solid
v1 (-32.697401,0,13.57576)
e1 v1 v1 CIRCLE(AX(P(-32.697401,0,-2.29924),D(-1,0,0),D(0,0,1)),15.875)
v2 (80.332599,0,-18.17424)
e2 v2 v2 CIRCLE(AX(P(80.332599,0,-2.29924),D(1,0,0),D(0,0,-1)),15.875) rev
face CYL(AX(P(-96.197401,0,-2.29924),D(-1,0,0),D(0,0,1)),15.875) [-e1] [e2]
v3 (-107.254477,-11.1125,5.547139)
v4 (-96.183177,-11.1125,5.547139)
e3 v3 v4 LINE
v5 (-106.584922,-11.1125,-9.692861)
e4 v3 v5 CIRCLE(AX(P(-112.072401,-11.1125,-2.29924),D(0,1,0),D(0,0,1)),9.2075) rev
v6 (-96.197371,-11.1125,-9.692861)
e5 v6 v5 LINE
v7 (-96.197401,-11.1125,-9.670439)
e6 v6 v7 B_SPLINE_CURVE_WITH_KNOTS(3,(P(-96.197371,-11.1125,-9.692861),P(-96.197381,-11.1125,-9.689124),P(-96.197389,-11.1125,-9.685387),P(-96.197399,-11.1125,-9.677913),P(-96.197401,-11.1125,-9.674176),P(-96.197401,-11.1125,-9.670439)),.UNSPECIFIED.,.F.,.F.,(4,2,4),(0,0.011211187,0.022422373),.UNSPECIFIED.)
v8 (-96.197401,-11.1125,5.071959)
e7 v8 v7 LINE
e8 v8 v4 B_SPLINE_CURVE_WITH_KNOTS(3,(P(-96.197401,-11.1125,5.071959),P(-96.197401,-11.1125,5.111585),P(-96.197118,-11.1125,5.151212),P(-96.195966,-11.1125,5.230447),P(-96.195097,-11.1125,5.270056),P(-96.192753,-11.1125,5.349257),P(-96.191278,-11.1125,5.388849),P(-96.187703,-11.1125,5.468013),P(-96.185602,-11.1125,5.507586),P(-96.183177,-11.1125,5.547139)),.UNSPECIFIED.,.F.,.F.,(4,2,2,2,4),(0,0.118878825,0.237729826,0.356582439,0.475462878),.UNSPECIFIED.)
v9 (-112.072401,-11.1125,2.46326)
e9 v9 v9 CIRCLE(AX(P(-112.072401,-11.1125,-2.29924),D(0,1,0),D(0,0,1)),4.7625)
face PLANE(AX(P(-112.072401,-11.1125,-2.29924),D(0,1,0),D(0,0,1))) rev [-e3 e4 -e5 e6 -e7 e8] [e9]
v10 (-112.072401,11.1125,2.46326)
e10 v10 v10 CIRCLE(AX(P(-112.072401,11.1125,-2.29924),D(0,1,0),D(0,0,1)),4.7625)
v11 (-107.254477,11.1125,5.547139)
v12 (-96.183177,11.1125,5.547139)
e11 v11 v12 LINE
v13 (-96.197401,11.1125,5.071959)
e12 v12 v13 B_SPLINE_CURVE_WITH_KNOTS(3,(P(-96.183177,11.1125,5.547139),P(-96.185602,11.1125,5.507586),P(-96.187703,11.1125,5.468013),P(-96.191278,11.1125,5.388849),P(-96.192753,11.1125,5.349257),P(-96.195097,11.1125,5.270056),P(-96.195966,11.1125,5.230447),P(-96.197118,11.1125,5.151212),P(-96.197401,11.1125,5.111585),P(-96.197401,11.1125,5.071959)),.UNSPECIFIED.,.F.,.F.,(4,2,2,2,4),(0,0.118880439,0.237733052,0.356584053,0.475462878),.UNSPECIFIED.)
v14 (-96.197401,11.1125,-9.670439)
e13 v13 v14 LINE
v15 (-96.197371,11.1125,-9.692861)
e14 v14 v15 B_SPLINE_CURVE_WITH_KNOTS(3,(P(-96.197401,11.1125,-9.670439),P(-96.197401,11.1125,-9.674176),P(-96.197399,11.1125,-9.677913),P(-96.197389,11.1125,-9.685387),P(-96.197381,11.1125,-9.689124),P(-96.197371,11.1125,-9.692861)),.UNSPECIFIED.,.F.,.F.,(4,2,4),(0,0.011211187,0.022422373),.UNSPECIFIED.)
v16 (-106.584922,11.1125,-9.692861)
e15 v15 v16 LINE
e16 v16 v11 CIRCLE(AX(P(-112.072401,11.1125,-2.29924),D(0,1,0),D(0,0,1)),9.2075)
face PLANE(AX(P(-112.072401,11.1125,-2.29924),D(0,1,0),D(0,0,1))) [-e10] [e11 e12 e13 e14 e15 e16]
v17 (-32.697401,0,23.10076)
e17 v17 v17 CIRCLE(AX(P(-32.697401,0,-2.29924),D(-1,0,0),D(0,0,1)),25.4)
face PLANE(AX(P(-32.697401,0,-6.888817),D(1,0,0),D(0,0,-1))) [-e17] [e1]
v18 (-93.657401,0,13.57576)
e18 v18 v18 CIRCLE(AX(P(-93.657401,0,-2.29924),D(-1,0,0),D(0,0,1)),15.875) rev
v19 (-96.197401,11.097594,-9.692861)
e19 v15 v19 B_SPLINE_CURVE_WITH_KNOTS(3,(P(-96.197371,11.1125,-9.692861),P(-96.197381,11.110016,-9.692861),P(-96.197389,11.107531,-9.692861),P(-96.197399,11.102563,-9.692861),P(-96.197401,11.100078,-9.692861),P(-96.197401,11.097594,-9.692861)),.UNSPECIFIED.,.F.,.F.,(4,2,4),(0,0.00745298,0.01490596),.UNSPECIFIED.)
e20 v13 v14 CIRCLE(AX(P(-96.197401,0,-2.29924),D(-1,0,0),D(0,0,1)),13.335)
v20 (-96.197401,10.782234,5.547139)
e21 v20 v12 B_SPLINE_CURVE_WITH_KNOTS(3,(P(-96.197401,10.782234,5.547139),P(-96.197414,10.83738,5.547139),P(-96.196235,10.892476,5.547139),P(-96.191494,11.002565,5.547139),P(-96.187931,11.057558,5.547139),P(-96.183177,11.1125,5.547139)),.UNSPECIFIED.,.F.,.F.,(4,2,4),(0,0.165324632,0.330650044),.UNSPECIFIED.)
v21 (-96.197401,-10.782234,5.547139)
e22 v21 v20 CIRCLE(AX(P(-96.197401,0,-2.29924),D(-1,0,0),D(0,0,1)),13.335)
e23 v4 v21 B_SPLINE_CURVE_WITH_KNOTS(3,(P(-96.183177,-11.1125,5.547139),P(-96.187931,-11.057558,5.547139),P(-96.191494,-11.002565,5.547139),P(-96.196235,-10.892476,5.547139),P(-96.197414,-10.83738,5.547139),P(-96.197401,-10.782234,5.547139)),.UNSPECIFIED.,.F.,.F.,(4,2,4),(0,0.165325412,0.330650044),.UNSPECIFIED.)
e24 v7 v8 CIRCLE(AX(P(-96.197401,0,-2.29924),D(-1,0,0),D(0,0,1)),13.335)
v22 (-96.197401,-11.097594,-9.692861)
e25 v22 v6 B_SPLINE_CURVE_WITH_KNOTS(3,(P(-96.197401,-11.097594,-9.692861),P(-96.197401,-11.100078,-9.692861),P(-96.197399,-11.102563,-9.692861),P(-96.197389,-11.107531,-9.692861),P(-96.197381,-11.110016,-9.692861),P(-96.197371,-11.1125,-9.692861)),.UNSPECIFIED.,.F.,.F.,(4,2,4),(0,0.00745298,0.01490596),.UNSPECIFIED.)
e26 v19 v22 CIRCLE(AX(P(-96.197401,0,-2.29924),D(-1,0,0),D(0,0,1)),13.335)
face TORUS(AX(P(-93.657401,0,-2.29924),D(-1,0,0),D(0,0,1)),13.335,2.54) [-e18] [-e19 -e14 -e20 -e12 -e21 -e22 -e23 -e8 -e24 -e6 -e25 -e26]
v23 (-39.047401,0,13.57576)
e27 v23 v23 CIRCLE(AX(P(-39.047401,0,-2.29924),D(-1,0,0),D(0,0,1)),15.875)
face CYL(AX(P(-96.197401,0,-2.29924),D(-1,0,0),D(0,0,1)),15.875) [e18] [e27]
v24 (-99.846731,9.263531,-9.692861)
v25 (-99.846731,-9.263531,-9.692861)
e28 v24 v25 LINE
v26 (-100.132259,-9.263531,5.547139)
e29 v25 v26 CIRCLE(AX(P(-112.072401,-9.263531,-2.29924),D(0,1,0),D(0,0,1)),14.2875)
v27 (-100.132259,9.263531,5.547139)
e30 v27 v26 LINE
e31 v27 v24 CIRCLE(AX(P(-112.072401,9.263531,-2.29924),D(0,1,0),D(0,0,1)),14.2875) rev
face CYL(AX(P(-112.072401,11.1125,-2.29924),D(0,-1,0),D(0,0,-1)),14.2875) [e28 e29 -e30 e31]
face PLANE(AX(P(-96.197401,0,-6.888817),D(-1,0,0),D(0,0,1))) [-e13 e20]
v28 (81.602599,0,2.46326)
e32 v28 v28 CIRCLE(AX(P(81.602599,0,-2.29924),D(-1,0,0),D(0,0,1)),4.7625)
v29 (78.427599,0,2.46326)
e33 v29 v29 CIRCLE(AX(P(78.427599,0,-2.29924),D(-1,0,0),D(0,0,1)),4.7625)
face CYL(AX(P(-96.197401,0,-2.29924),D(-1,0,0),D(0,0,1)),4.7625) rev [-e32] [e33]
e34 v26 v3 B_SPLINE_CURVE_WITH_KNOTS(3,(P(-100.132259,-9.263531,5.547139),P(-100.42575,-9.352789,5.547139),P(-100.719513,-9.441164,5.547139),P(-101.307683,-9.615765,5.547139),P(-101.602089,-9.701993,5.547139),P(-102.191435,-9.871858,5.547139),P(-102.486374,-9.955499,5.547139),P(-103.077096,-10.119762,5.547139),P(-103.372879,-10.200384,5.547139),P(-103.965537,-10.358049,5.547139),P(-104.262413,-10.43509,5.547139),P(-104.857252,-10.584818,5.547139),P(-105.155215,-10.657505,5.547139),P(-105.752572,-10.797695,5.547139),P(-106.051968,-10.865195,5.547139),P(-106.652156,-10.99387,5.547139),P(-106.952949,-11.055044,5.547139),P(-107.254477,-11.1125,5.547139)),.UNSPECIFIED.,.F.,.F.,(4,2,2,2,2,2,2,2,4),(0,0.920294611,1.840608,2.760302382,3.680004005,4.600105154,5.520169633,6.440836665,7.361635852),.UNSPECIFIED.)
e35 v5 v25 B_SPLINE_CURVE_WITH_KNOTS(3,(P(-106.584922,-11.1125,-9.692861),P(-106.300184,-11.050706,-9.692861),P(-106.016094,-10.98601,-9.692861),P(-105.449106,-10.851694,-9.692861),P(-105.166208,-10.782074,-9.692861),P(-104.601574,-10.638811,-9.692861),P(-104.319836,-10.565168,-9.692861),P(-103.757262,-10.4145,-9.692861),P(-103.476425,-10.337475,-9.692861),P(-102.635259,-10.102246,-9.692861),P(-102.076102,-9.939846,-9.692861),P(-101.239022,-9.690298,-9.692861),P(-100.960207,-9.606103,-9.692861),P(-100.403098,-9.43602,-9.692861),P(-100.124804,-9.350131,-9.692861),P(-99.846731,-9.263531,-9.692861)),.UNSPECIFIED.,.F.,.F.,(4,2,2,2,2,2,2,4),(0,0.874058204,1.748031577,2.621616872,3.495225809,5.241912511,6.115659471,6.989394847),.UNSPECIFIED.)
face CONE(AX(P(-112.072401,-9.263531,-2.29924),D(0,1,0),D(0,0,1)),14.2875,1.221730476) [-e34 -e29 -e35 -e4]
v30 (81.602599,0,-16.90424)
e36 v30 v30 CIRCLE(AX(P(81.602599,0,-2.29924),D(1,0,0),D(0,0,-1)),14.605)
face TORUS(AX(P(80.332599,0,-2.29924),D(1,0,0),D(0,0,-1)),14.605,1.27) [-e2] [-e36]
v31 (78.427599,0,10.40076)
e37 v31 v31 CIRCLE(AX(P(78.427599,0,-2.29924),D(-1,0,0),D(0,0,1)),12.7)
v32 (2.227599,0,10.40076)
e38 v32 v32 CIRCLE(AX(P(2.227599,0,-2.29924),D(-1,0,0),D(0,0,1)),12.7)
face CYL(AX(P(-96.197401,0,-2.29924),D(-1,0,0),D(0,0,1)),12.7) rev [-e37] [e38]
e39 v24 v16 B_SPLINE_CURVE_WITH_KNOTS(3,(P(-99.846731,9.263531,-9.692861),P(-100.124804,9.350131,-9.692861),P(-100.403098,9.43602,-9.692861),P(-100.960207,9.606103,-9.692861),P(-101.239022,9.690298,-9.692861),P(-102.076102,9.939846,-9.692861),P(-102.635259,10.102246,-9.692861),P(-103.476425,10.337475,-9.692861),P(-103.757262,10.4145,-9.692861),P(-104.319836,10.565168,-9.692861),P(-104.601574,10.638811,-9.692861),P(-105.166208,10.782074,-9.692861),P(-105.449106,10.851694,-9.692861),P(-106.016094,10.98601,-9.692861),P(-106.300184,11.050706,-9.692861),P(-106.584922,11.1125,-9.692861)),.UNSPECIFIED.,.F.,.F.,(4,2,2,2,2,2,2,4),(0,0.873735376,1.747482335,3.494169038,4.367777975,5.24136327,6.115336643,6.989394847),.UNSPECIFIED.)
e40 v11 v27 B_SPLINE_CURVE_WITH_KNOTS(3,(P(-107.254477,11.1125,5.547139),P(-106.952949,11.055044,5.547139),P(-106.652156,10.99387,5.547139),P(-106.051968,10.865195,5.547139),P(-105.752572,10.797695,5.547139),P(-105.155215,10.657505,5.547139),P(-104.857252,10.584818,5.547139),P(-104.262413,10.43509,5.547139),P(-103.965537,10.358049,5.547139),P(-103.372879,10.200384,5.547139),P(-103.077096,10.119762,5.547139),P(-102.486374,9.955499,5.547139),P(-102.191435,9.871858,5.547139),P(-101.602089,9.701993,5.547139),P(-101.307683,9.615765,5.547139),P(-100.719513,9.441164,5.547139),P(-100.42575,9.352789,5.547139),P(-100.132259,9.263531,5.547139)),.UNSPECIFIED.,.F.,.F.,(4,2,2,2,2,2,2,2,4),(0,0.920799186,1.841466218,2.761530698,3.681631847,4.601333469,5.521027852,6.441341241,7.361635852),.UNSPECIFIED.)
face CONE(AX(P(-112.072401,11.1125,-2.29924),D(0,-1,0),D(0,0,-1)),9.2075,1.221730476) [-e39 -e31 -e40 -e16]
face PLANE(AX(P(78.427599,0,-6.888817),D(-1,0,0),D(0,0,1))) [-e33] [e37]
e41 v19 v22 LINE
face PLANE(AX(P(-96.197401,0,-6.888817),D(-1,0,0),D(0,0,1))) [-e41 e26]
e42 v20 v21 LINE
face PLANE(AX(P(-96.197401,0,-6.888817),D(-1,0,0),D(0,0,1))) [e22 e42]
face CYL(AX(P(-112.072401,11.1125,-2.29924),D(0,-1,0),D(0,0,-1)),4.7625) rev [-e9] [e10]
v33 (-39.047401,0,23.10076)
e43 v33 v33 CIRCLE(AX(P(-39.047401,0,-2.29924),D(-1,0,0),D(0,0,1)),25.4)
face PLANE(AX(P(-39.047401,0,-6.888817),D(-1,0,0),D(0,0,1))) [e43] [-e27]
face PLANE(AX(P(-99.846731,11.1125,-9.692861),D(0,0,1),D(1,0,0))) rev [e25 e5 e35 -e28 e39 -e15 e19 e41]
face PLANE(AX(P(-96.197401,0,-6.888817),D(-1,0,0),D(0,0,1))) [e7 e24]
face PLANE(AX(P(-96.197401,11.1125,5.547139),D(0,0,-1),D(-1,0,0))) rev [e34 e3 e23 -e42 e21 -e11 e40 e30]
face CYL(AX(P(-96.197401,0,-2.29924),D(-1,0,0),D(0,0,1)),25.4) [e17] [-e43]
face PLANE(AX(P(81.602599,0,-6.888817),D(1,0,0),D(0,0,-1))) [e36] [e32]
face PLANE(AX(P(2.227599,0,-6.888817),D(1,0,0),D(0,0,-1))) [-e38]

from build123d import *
from OCP.BRepFilletAPI import BRepFilletAPI_MakeChamfer

# Parameters (mm, degrees)
SKETCH2_R           = 4.7625
BOSS_EXTRUDE1_DEPTH = 11.1125
FILLET1_R           = 2.54
CHAMFER1_SIZE       = 5.08
CHAMFER1_SIZE2      = 1.84896879
FILLET2_R           = 1.27


with BuildPart() as part:
    # Sketch1 → Revolve1 (revolve)
    with BuildSketch(Plane(origin=(0, 0, 0), x_dir=(1, 0, 0), z_dir=(0, 1, 0)), mode=Mode.PRIVATE) as revolve1_sk:
        Polygon((-96.197401359, 18.174240066), (-96.197401359, 2.299240066), (2.227598641, 2.299240066), (2.227598641, 14.999240066), (78.427598641, 14.999240066), (78.427598641, 7.061740066), (81.602598641, 7.061740066), (81.602598641, 18.174240066), (-32.697401359, 18.174240066), (-32.697401359, 27.699240066), (-39.047401359, 27.699240066), (-39.047401359, 18.174240066), align=None)
    revolve(revolve1_sk.sketch.rotate(Axis((-96.197401359, 0, -2.299240066), (1, 0, 0)), 180), axis=Axis((-96.197401359, 0, -2.299240066), (1, 0, 0)))

    # Sketch2 → Boss-Extrude1 (add, symmetric)
    with BuildSketch(Plane(origin=(0, 0, 0), x_dir=(1, 0, 0), z_dir=(0, 1, 0))):
        with BuildLine():
            Line((-99.846730597, 9.692861011), (-96.197401359, 9.692861011))
            Line((-96.197401359, 9.692861011), (-96.197401359, -5.547138989))
            Line((-96.197401359, -5.547138989), (-100.132259318, -5.547138989))
            ThreePointArc((-100.132259318, -5.547138989), (-126.357394433, 2.566876274), (-99.846730597, 9.692861011))
        make_face()
        with Locations(Location((-112.072401359, 2.299240066, 0), (0, 0, 270))):
            Circle(SKETCH2_R, mode=Mode.SUBTRACT)
    extrude(amount=BOSS_EXTRUDE1_DEPTH, both=True)

    # Fillet1
    # the kernel refuses this fillet: 2.54 mm, written as the material it takes off along each edge
    with BuildSketch(Plane(origin=(-96.197401359, 0, -2.299240066), x_dir=(0, 0, 1), z_dir=(0, 1, 0))) as fillet1_piece_1_section:
        with BuildLine():
            CenterArc((15.875 - FILLET1_R, FILLET1_R), FILLET1_R, 270, 90)
            Line((15.875, FILLET1_R), (15.875, 0))
            Line((15.875, 0), (15.875 - FILLET1_R, 0))
        make_face()
    fillet1_piece_1 = revolve(axis=Axis((-96.197401359, 0, -2.299240066), (1, 0, 0)), mode=Mode.PRIVATE)
    fillet1_piece_1 = split(fillet1_piece_1, bisect_by=Plane(origin=(-95.476463438, -6.970916777, 5.547138989), z_dir=(0, 0, 1)), keep=Keep.TOP, mode=Mode.PRIVATE)
    add(fillet1_piece_1, mode=Mode.SUBTRACT)
    with BuildSketch(Plane(origin=(-96.197401359, 0, -2.299240066), x_dir=(0, 0, 1), z_dir=(0, 1, 0))) as fillet1_piece_2_section:
        with BuildLine():
            CenterArc((15.875 - FILLET1_R, FILLET1_R), FILLET1_R, 270, 90)
            Line((15.875, FILLET1_R), (15.875, 0))
            Line((15.875, 0), (15.875 - FILLET1_R, 0))
        make_face()
    fillet1_piece_2 = revolve(axis=Axis((-96.197401359, 0, -2.299240066), (1, 0, 0)), mode=Mode.PRIVATE)
    fillet1_piece_2 = split(fillet1_piece_2, bisect_by=Plane(origin=(-95.473294042, -11.1125, -2.089306166), z_dir=(0, -1, 0)), keep=Keep.TOP, mode=Mode.PRIVATE)
    add(fillet1_piece_2, mode=Mode.SUBTRACT)
    with BuildSketch(Plane(origin=(-96.197401359, 0, -2.299240066), x_dir=(0, 0, 1), z_dir=(0, 1, 0))) as fillet1_piece_3_section:
        with BuildLine():
            CenterArc((15.875 - FILLET1_R, FILLET1_R), FILLET1_R, 270, 90)
            Line((15.875, FILLET1_R), (15.875, 0))
            Line((15.875, 0), (15.875 - FILLET1_R, 0))
        make_face()
    fillet1_piece_3 = revolve(axis=Axis((-96.197401359, 0, -2.299240066), (1, 0, 0)), mode=Mode.PRIVATE)
    fillet1_piece_3 = split(fillet1_piece_3, bisect_by=Plane(origin=(-95.473294037, 11.1125, -2.089306166), z_dir=(0, 1, 0)), keep=Keep.TOP, mode=Mode.PRIVATE)
    add(fillet1_piece_3, mode=Mode.SUBTRACT)
    with BuildSketch(Plane(origin=(-96.197401359, 0, -2.299240066), x_dir=(0, 0, 1), z_dir=(0, 1, 0))) as fillet1_piece_4_section:
        with BuildLine():
            CenterArc((15.875 - FILLET1_R, FILLET1_R), FILLET1_R, 270, 90)
            Line((15.875, FILLET1_R), (15.875, 0))
            Line((15.875, 0), (15.875 - FILLET1_R, 0))
        make_face()
    fillet1_piece_4 = revolve(axis=Axis((-96.197401359, 0, -2.299240066), (1, 0, 0)), mode=Mode.PRIVATE)
    fillet1_piece_4 = split(fillet1_piece_4, bisect_by=Plane(origin=(-95.47646351, 0, -9.692861011), z_dir=(0, 0, -1)), keep=Keep.TOP, mode=Mode.PRIVATE)
    add(fillet1_piece_4, mode=Mode.SUBTRACT)

    # Chamfer1: one chamfer whose edges measure the first distance from different faces: ONE call of the kernel's chamfer builder (chamfer() names one face for all edges)
    chamfer1_edges_1 = [part.edges().sort_by_distance(p)[0] for p in [
        (-126.357394433, 11.1125, -2.566876274),
    ]]
    chamfer1_side_1 = [part.faces().sort_by_distance(p)[0] for p in [
        (-125.941875569, 11.1125, -2.559091328),
    ]]
    chamfer1_edges_2 = [part.edges().sort_by_distance(p)[0] for p in [
        (-126.357394433, -11.1125, -2.566876274),
    ]]
    chamfer1_side_2 = [part.faces().sort_by_distance(p)[0] for p in [
        (-125.941875569, -11.1125, -2.559091328),
    ]]
    chamfer1 = BRepFilletAPI_MakeChamfer(part.part.solid().wrapped)
    for e in chamfer1_edges_1:
        chamfer1.Add(CHAMFER1_SIZE, CHAMFER1_SIZE2, e.wrapped, chamfer1_side_1[0].wrapped)  # the first distance lies on this face
    for e in chamfer1_edges_2:
        chamfer1.Add(CHAMFER1_SIZE, CHAMFER1_SIZE2, e.wrapped, chamfer1_side_2[0].wrapped)  # the first distance lies on this face
    add(Compound.cast(chamfer1.Shape()), mode=Mode.REPLACE)

    # Fillet2
    fillet2_edges = [part.edges().sort_by_distance(p)[0] for p in [
        (81.602598641, 0, -18.174240066),
    ]]
    fillet(fillet2_edges, radius=FILLET2_R)


solid = part.part
